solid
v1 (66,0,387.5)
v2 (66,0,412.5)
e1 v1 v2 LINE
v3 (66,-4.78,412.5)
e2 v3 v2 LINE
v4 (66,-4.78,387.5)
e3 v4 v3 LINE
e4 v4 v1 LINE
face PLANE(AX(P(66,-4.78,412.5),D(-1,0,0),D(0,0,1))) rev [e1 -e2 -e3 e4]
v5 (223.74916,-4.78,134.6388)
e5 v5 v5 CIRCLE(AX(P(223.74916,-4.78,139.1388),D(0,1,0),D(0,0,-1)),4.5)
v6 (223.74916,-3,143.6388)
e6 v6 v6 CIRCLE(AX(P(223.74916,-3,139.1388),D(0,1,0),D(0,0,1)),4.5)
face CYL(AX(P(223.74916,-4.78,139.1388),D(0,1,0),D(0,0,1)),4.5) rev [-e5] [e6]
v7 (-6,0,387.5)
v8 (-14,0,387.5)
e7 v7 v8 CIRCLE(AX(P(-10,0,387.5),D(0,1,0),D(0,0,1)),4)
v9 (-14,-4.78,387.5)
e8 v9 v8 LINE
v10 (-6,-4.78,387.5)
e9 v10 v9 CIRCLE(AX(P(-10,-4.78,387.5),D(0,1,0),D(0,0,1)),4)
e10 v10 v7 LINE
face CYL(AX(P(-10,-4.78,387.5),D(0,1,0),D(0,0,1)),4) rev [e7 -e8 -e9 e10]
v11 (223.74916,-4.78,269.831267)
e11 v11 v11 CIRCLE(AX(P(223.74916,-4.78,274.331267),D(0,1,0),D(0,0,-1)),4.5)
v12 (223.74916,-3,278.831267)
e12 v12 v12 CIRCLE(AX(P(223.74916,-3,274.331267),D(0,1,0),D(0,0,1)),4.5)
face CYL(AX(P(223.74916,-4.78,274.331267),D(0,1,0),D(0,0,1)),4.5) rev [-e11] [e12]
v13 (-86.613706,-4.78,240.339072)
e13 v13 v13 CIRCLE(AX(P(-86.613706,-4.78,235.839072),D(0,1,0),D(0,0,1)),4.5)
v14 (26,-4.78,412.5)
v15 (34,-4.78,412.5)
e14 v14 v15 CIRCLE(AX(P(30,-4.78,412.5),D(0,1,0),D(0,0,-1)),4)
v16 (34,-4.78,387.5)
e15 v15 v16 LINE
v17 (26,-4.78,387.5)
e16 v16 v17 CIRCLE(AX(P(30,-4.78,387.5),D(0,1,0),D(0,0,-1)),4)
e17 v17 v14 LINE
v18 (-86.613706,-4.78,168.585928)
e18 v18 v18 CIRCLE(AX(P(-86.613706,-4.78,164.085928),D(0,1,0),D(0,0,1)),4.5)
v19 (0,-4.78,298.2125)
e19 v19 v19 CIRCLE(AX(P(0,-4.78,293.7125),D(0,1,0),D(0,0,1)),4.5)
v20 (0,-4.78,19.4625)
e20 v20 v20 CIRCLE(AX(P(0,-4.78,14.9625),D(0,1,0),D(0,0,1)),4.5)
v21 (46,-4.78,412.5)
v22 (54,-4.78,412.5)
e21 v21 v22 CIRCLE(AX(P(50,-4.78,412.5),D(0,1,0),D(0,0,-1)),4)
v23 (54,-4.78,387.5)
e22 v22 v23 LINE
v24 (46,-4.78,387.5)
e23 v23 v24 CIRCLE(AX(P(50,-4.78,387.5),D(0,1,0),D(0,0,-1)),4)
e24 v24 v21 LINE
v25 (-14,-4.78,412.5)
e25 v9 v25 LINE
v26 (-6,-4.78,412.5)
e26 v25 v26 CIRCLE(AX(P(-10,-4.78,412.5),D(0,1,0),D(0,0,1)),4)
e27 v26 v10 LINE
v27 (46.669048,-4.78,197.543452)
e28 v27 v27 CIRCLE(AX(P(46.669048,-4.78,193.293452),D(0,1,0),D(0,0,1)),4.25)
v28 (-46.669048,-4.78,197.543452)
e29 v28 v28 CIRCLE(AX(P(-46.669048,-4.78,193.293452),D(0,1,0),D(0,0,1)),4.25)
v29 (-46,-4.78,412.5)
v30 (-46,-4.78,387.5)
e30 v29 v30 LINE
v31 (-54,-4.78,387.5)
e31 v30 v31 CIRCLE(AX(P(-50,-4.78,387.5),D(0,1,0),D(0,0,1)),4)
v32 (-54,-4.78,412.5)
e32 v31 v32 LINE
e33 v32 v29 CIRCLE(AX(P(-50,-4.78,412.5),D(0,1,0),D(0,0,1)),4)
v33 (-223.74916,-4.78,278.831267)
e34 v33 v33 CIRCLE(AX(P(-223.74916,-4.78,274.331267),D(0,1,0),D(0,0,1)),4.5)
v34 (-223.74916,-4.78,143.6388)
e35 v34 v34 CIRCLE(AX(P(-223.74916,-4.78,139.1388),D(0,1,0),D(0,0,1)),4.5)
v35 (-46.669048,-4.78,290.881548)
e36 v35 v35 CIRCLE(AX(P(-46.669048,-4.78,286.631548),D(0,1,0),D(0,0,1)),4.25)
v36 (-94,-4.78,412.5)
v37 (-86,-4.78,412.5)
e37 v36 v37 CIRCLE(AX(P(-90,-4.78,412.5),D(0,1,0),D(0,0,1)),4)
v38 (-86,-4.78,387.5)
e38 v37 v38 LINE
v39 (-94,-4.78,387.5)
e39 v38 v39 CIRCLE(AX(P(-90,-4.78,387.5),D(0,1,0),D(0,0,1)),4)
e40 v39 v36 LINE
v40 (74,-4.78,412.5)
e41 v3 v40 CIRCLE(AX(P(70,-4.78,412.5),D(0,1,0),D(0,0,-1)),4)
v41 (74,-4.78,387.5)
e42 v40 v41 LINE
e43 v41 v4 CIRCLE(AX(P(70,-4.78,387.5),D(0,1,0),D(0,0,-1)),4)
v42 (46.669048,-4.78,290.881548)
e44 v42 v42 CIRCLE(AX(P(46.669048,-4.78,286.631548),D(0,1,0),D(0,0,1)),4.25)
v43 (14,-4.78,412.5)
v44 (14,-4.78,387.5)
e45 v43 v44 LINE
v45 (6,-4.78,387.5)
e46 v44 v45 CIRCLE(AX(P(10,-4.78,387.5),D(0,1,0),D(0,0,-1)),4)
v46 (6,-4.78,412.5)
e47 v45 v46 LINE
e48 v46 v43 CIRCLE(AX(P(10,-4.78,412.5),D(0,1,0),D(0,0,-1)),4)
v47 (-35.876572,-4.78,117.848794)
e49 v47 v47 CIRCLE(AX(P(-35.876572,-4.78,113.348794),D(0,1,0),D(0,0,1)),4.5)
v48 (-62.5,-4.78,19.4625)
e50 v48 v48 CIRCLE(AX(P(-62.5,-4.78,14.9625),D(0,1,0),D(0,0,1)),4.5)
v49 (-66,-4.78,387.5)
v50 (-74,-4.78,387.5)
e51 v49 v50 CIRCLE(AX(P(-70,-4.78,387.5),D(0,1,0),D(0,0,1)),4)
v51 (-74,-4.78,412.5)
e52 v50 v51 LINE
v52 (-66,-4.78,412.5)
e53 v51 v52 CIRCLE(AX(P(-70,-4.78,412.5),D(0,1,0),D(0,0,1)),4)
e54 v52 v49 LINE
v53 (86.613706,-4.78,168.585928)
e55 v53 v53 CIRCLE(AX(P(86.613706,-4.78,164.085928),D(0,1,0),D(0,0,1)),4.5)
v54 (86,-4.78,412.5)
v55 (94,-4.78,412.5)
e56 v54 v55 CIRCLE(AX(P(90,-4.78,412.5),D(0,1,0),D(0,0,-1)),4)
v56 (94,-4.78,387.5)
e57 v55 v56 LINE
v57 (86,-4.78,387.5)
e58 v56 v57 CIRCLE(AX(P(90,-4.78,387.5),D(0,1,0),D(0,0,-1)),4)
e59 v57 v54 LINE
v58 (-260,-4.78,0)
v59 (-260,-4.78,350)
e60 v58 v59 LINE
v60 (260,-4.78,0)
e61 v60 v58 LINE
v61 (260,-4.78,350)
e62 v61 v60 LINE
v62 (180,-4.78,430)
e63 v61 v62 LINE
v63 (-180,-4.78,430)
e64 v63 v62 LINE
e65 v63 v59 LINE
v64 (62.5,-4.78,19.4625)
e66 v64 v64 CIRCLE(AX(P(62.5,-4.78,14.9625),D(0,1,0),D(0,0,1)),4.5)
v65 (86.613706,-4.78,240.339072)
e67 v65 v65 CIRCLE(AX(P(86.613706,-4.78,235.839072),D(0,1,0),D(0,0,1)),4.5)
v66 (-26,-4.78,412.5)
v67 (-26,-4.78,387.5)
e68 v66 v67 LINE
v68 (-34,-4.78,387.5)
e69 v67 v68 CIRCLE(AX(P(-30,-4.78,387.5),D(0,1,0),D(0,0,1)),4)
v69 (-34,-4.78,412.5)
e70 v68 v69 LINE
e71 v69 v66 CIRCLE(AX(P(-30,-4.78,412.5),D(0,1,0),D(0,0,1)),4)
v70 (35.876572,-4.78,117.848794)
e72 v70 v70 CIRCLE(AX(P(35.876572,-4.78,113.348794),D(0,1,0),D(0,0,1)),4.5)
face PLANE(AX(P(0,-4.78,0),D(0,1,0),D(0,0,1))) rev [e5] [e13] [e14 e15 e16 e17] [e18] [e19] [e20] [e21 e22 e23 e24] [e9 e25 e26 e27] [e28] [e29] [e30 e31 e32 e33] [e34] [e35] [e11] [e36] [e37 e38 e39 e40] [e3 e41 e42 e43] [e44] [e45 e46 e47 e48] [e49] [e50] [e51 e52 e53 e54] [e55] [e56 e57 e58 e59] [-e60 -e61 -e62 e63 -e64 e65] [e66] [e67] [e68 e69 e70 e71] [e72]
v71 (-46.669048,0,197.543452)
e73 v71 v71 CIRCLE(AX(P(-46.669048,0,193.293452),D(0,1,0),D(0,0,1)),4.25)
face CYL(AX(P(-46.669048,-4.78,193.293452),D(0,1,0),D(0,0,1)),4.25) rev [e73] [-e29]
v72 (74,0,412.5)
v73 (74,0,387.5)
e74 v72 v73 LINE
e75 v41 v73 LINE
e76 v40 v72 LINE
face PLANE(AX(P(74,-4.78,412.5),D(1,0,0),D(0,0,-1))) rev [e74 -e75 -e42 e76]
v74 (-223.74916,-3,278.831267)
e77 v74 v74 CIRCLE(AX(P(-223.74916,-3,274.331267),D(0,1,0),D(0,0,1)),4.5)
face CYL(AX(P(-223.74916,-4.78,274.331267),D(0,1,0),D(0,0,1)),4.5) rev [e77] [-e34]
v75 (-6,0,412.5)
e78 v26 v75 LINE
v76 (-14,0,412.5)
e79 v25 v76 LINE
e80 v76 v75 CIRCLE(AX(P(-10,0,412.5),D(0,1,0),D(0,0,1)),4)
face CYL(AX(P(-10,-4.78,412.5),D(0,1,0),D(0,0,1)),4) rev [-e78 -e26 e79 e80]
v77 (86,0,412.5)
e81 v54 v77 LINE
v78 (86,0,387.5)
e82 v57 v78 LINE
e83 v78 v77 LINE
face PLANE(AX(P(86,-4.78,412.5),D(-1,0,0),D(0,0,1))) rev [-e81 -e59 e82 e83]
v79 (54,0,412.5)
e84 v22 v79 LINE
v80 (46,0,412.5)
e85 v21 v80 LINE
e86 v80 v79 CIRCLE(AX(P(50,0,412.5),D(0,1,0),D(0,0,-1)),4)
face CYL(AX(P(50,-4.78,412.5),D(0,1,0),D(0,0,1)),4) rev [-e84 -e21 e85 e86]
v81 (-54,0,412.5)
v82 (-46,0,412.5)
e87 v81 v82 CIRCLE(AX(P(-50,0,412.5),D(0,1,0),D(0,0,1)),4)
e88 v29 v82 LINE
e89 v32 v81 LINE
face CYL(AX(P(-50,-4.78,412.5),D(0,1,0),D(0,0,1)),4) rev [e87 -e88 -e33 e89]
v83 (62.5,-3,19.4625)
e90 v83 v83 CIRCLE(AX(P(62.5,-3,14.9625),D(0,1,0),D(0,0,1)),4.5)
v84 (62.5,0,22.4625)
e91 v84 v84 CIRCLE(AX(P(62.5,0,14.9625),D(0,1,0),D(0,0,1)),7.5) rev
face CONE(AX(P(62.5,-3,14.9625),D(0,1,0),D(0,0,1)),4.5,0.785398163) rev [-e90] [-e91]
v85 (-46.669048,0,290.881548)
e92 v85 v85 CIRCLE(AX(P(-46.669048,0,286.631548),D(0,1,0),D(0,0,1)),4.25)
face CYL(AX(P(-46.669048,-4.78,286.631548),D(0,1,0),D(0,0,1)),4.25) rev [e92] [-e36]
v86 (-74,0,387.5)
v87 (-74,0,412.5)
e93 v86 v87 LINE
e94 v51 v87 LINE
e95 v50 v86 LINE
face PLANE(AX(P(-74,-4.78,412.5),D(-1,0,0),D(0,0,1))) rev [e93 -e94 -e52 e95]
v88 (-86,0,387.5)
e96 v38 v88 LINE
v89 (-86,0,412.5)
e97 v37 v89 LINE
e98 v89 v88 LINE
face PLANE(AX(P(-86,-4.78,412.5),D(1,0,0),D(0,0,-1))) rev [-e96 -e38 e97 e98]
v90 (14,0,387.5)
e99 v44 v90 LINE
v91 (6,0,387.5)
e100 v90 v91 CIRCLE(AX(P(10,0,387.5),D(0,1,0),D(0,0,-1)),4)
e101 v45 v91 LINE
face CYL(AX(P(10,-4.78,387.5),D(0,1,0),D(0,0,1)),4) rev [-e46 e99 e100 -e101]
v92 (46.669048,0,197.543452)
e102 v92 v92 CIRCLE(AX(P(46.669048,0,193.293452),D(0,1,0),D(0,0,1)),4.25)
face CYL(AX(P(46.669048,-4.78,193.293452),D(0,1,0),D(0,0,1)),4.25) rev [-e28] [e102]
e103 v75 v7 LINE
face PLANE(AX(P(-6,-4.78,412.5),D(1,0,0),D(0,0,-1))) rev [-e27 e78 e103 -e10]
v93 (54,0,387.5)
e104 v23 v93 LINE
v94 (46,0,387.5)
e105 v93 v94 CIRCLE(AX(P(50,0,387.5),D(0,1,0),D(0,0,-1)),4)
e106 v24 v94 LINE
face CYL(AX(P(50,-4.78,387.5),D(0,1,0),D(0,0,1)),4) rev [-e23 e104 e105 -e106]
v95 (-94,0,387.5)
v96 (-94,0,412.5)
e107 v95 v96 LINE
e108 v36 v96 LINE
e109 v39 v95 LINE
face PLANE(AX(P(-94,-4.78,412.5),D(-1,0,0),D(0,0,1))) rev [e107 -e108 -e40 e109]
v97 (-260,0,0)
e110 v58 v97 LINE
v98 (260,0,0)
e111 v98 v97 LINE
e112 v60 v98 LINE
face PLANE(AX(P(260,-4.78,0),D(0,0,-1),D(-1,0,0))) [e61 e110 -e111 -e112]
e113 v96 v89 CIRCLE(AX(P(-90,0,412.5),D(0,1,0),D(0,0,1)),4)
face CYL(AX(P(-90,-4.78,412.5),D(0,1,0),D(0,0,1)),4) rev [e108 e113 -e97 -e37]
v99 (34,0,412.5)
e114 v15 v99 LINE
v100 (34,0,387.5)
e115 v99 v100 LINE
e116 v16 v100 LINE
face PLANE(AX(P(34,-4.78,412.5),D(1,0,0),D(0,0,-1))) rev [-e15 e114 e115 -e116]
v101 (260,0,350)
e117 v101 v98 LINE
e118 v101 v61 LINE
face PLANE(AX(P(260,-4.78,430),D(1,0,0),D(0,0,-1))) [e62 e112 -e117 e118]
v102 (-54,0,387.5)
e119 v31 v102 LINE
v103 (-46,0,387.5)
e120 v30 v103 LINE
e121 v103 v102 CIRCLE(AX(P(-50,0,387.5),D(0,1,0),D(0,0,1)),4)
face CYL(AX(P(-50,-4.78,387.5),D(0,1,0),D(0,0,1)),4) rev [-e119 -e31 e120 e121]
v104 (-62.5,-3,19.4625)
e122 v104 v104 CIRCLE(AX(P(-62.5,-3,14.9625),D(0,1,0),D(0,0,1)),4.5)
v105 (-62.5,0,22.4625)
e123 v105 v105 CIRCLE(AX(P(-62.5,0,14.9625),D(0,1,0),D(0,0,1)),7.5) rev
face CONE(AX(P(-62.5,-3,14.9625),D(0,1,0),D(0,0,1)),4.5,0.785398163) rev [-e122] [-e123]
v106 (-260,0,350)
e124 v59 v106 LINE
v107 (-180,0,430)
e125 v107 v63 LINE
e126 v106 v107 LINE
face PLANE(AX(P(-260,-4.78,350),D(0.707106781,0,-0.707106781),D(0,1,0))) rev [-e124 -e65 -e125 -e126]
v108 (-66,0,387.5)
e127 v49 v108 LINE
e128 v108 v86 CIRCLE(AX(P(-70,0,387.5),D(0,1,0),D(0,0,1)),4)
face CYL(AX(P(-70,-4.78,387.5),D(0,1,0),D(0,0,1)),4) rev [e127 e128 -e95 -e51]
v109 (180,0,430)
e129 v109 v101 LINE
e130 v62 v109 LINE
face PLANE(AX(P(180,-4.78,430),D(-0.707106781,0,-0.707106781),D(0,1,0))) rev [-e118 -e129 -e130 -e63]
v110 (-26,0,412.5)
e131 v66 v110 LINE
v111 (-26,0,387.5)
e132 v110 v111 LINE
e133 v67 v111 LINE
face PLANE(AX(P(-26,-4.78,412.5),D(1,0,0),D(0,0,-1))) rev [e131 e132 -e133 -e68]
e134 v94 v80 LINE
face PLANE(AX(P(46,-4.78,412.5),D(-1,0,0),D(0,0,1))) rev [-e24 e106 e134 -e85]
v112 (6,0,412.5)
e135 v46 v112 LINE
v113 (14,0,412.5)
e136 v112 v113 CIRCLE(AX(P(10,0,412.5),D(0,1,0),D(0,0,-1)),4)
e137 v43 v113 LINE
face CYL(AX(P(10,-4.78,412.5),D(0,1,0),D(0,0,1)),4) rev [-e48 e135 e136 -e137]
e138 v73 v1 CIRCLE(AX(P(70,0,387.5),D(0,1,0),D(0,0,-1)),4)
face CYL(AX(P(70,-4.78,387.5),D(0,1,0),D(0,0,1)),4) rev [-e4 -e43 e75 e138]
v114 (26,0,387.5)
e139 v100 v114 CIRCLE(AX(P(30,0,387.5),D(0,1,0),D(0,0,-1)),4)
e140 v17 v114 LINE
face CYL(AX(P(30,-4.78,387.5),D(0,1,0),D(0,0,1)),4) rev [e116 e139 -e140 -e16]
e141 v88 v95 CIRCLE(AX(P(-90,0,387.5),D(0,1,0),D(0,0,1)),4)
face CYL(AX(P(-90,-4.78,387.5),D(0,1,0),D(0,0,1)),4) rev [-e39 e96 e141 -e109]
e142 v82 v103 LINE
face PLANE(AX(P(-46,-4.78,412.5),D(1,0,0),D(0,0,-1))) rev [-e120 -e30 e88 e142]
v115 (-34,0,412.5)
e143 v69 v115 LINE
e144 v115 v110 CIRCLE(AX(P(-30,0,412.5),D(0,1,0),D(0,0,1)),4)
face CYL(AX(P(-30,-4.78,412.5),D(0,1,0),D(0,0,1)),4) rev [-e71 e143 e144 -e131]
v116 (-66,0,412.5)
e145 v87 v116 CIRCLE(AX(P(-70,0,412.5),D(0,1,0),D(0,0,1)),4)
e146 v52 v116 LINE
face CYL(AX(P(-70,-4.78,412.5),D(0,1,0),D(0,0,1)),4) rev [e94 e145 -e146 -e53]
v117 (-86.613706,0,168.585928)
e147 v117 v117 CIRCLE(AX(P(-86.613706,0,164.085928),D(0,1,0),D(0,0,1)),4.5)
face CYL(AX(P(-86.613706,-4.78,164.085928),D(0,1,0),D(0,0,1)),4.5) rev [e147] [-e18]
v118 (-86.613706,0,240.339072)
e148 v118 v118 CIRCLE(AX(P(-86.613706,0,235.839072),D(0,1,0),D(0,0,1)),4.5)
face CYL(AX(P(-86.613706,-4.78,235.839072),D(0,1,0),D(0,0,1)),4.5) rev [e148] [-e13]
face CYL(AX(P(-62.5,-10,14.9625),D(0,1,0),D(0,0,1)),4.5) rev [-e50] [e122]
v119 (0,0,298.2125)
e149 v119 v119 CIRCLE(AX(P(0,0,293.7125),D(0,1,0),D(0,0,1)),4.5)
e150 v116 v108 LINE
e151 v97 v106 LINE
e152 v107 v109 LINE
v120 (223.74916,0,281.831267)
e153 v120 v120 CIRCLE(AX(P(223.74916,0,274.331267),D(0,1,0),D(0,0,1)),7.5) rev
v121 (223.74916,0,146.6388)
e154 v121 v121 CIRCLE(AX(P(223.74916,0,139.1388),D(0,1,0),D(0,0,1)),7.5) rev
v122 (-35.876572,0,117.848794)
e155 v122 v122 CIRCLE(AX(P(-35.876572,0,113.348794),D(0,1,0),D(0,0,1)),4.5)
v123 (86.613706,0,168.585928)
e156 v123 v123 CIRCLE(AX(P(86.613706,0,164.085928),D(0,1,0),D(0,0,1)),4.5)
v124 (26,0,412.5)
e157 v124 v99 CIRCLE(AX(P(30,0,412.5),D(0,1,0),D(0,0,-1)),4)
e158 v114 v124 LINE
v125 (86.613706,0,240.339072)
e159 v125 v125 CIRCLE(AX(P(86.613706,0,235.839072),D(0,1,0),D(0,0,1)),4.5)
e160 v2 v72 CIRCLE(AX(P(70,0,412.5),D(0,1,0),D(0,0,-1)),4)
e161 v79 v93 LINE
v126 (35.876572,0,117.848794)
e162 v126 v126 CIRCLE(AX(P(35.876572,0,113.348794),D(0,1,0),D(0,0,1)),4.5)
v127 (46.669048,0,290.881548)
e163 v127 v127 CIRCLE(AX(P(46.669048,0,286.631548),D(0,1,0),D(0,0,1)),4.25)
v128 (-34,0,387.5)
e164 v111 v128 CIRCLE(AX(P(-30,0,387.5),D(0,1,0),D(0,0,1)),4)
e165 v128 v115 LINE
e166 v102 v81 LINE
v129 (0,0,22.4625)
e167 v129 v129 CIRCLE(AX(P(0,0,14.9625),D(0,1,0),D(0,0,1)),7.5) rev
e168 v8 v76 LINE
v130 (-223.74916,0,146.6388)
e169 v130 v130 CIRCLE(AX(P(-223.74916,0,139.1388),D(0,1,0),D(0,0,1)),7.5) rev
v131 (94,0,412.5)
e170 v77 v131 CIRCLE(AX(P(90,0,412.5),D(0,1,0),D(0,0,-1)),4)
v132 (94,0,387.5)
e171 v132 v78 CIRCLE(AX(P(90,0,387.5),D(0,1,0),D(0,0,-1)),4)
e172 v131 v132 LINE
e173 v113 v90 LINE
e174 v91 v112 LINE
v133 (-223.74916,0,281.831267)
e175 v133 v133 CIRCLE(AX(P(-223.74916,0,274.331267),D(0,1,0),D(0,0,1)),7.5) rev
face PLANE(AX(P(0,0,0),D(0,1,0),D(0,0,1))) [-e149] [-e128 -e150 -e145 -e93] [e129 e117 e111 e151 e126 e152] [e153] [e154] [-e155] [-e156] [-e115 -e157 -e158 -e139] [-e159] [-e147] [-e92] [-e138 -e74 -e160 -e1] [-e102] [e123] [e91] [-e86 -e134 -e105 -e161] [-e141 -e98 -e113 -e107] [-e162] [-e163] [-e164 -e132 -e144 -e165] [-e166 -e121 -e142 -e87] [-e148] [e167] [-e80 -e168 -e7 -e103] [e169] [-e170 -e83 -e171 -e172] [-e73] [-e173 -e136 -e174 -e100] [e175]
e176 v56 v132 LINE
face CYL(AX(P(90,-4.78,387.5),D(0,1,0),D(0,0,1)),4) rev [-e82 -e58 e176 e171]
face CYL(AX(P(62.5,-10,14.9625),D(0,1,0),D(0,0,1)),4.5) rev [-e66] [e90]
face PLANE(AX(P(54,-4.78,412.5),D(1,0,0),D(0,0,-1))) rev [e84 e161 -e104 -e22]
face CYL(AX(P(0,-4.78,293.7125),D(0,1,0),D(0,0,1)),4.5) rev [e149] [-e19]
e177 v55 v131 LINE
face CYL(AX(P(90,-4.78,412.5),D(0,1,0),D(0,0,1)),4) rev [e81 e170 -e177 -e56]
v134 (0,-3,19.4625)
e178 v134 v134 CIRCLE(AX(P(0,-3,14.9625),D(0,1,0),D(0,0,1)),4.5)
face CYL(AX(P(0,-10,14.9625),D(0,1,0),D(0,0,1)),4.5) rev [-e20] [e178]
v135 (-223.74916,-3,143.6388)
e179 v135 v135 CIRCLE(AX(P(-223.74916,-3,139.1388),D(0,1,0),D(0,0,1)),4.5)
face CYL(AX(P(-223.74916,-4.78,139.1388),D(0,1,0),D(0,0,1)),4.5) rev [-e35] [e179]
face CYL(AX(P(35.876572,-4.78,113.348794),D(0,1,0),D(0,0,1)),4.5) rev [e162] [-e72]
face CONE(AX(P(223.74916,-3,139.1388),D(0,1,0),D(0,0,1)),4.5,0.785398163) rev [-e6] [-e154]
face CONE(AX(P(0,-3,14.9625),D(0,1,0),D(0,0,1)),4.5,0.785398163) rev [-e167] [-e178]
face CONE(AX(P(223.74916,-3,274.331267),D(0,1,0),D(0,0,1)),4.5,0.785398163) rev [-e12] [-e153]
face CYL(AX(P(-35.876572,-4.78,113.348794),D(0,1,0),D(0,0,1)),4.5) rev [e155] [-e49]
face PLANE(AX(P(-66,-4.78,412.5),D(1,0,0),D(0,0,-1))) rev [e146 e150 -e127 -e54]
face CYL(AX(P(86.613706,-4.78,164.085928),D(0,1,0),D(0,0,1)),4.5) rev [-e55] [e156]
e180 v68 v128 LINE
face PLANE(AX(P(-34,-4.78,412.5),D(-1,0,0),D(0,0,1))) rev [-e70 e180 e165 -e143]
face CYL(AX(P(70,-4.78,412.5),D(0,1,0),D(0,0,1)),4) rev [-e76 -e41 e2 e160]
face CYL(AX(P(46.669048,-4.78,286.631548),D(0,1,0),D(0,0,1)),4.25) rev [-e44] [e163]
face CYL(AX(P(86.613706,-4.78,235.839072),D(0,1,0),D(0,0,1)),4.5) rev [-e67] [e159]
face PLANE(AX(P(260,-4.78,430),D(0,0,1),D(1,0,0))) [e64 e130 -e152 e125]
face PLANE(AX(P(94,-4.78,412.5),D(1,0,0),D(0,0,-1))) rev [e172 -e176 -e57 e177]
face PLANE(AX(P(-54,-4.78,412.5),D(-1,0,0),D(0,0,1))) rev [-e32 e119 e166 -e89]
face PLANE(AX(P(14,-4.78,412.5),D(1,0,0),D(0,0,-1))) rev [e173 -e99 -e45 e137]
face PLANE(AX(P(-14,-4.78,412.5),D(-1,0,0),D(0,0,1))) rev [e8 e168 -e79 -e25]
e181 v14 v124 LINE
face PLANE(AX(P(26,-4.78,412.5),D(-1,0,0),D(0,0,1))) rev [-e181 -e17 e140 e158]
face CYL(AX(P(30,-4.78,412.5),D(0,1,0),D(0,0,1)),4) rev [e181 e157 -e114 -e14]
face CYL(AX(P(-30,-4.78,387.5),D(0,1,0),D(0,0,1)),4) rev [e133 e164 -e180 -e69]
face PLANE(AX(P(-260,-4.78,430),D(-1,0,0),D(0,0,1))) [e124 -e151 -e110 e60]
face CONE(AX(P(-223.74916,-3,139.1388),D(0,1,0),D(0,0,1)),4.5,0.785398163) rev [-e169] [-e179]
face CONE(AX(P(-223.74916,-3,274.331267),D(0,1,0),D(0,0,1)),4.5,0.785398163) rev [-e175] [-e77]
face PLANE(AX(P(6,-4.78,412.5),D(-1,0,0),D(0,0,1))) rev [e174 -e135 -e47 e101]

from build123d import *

# Parameters (mm, degrees)
SKETCH1_W          = 520
SKETCH1_H          = 430
BASE_FLANGE1_DEPTH = 4.78
SKETCH6_R          = 4.5
CUT_EXTRUDE1_DEPTH = 10
CHAMFER1_SIZE      = 80
SKETCH7_R          = 4.5
CUT_EXTRUDE2_DEPTH = 10
SKETCH8_R          = 4.25
CUT_EXTRUDE3_DEPTH = 10
SKETCH9_R          = 4.5
CUT_EXTRUDE4_DEPTH = 10
CUT_EXTRUDE5_DEPTH = 10
CHAMFER2_SIZE      = 3


# Sheet-metal steps are written as plain solids
with BuildPart() as part:
    # Sketch1 → Base-Flange1 (new body)
    with BuildSketch(Plane(origin=(0, 0, 0), x_dir=(1, 0, 0), z_dir=(0, 1, 0))):
        with Locations((0, -215)):
            Rectangle(SKETCH1_W, SKETCH1_H)
    extrude(amount=-BASE_FLANGE1_DEPTH)

    # Sketch6 → Cut-Extrude1 (cut)
    with BuildSketch(Plane(origin=(0, 0, 0), x_dir=(1, 0, 0), z_dir=(0, 1, 0))):
        with Locations(Location((62.5, -14.9625, 0), (0, 0, 270))):
            Circle(SKETCH6_R)
        with Locations(Location((0, -14.9625, 0), (0, 0, 270))):
            Circle(SKETCH6_R)
        with Locations(Location((-62.5, -14.9625, 0), (0, 0, 270))):
            Circle(SKETCH6_R)
    extrude(amount=-CUT_EXTRUDE1_DEPTH, mode=Mode.SUBTRACT)

    # Chamfer1
    chamfer1_edges = [part.edges().sort_by_distance(p)[0] for p in [
        (260, -2.39, 430),
        (-260, -2.39, 430),
    ]]
    chamfer(chamfer1_edges, length=CHAMFER1_SIZE)

    # Sketch7 → Cut-Extrude2 (cut)
    with BuildSketch(Plane(origin=(0, 0, 0), x_dir=(1, 0, 0), z_dir=(0, 1, 0))):
        with Locations(Location((-223.749160028, -139.138800169, 0), (0, 0, 270))):
            Circle(SKETCH7_R)
        with Locations(Location((-223.749160028, -274.331266718, 0), (0, 0, 270))):
            Circle(SKETCH7_R)
        with Locations(Location((223.749160028, -274.331266718, 0), (0, 0, 90))):
            Circle(SKETCH7_R)
        with Locations(Location((223.749160028, -139.138800169, 0), (0, 0, 90))):
            Circle(SKETCH7_R)
    extrude(amount=-CUT_EXTRUDE2_DEPTH, mode=Mode.SUBTRACT)

    # Sketch8 → Cut-Extrude3 (cut)
    with BuildSketch(Plane(origin=(0, 0, 0), x_dir=(1, 0, 0), z_dir=(0, 1, 0))):
        with Locations(Location((46.669047558, -193.293452442, 0), (0, 0, 270))):
            Circle(SKETCH8_R)
        with Locations(Location((46.669047558, -286.631547558, 0), (0, 0, 270))):
            Circle(SKETCH8_R)
        with Locations(Location((-46.669047558, -286.631547558, 0), (0, 0, 270))):
            Circle(SKETCH8_R)
        with Locations(Location((-46.669047558, -193.293452442, 0), (0, 0, 270))):
            Circle(SKETCH8_R)
    extrude(amount=-CUT_EXTRUDE3_DEPTH, mode=Mode.SUBTRACT)

    # Sketch9 → Cut-Extrude4 (cut)
    with BuildSketch(Plane(origin=(0, 0, 0), x_dir=(1, 0, 0), z_dir=(0, 1, 0))):
        with Locations(Location((86.613706173, -164.085928216, 0), (0, 0, 270))):
            Circle(SKETCH9_R)
        with Locations(Location((86.613706173, -235.839071784, 0), (0, 0, 270))):
            Circle(SKETCH9_R)
        with Locations(Location((35.876571784, -113.348793827, 0), (0, 0, 270))):
            Circle(SKETCH9_R)
        with Locations(Location((-35.876571784, -113.348793827, 0), (0, 0, 270))):
            Circle(SKETCH9_R)
        with Locations(Location((-86.613706173, -164.085928216, 0), (0, 0, 270))):
            Circle(SKETCH9_R)
        with Locations(Location((-86.613706173, -235.839071784, 0), (0, 0, 270))):
            Circle(SKETCH9_R)
        with Locations(Location((0, -293.7125, 0), (0, 0, 270))):
            Circle(SKETCH9_R)
    extrude(amount=-CUT_EXTRUDE4_DEPTH, mode=Mode.SUBTRACT)

    # Sketch10 → Cut-Extrude5 (cut)
    with BuildSketch(Plane(origin=(0, 0, 0), x_dir=(1, 0, 0), z_dir=(0, 1, 0))):
        with BuildLine():
            Line((-14, -412.5), (-14, -387.5))
            ThreePointArc((-14, -387.5), (-10, -383.5), (-6, -387.5))
            Line((-6, -387.5), (-6, -412.5))
            ThreePointArc((-6, -412.5), (-10, -416.5), (-14, -412.5))
        make_face()
        with BuildLine():
            Line((-34, -412.5), (-34, -387.5))
            ThreePointArc((-34, -387.5), (-30, -383.5), (-26, -387.5))
            Line((-26, -387.5), (-26, -412.5))
            ThreePointArc((-26, -412.5), (-30, -416.5), (-34, -412.5))
        make_face()
        with BuildLine():
            Line((-54, -412.5), (-54, -387.5))
            ThreePointArc((-54, -387.5), (-50, -383.5), (-46, -387.5))
            Line((-46, -387.5), (-46, -412.5))
            ThreePointArc((-46, -412.5), (-50, -416.5), (-54, -412.5))
        make_face()
        with BuildLine():
            Line((-74, -412.5), (-74, -387.5))
            ThreePointArc((-74, -387.5), (-70, -383.5), (-66, -387.5))
            Line((-66, -387.5), (-66, -412.5))
            ThreePointArc((-66, -412.5), (-70, -416.5), (-74, -412.5))
        make_face()
        with BuildLine():
            Line((-94, -412.5), (-94, -387.5))
            ThreePointArc((-94, -387.5), (-90, -383.5), (-86, -387.5))
            Line((-86, -387.5), (-86, -412.5))
            ThreePointArc((-86, -412.5), (-90, -416.5), (-94, -412.5))
        make_face()
        with BuildLine():
            Line((14, -412.5), (14, -387.5))
            ThreePointArc((14, -387.5), (10, -383.5), (6, -387.5))
            Line((6, -387.5), (6, -412.5))
            ThreePointArc((6, -412.5), (10, -416.5), (14, -412.5))
        make_face()
        with BuildLine():
            Line((34, -412.5), (34, -387.5))
            ThreePointArc((34, -387.5), (30, -383.5), (26, -387.5))
            Line((26, -387.5), (26, -412.5))
            ThreePointArc((26, -412.5), (30, -416.5), (34, -412.5))
        make_face()
        with BuildLine():
            Line((54, -412.5), (54, -387.5))
            ThreePointArc((54, -387.5), (50, -383.5), (46, -387.5))
            Line((46, -387.5), (46, -412.5))
            ThreePointArc((46, -412.5), (50, -416.5), (54, -412.5))
        make_face()
        with BuildLine():
            Line((74, -412.5), (74, -387.5))
            ThreePointArc((74, -387.5), (70, -383.5), (66, -387.5))
            Line((66, -387.5), (66, -412.5))
            ThreePointArc((66, -412.5), (70, -416.5), (74, -412.5))
        make_face()
        with BuildLine():
            Line((94, -412.5), (94, -387.5))
            ThreePointArc((94, -387.5), (90, -383.5), (86, -387.5))
            Line((86, -387.5), (86, -412.5))
            ThreePointArc((86, -412.5), (90, -416.5), (94, -412.5))
        make_face()
    extrude(amount=-CUT_EXTRUDE5_DEPTH, mode=Mode.SUBTRACT)

    # Chamfer2
    chamfer2_edges = [part.edges().sort_by_distance(p)[0] for p in [
        (62.5, 0, 10.4625),
        (0, 0, 10.4625),
        (-62.5, 0, 10.4625),
        (-223.749160028, 0, 134.638800169),
        (-223.749160028, 0, 269.831266718),
        (223.749160028, 0, 278.831266718),
        (223.749160028, 0, 143.638800169),
    ]]
    chamfer(chamfer2_edges, length=CHAMFER2_SIZE)


solid = part.part
